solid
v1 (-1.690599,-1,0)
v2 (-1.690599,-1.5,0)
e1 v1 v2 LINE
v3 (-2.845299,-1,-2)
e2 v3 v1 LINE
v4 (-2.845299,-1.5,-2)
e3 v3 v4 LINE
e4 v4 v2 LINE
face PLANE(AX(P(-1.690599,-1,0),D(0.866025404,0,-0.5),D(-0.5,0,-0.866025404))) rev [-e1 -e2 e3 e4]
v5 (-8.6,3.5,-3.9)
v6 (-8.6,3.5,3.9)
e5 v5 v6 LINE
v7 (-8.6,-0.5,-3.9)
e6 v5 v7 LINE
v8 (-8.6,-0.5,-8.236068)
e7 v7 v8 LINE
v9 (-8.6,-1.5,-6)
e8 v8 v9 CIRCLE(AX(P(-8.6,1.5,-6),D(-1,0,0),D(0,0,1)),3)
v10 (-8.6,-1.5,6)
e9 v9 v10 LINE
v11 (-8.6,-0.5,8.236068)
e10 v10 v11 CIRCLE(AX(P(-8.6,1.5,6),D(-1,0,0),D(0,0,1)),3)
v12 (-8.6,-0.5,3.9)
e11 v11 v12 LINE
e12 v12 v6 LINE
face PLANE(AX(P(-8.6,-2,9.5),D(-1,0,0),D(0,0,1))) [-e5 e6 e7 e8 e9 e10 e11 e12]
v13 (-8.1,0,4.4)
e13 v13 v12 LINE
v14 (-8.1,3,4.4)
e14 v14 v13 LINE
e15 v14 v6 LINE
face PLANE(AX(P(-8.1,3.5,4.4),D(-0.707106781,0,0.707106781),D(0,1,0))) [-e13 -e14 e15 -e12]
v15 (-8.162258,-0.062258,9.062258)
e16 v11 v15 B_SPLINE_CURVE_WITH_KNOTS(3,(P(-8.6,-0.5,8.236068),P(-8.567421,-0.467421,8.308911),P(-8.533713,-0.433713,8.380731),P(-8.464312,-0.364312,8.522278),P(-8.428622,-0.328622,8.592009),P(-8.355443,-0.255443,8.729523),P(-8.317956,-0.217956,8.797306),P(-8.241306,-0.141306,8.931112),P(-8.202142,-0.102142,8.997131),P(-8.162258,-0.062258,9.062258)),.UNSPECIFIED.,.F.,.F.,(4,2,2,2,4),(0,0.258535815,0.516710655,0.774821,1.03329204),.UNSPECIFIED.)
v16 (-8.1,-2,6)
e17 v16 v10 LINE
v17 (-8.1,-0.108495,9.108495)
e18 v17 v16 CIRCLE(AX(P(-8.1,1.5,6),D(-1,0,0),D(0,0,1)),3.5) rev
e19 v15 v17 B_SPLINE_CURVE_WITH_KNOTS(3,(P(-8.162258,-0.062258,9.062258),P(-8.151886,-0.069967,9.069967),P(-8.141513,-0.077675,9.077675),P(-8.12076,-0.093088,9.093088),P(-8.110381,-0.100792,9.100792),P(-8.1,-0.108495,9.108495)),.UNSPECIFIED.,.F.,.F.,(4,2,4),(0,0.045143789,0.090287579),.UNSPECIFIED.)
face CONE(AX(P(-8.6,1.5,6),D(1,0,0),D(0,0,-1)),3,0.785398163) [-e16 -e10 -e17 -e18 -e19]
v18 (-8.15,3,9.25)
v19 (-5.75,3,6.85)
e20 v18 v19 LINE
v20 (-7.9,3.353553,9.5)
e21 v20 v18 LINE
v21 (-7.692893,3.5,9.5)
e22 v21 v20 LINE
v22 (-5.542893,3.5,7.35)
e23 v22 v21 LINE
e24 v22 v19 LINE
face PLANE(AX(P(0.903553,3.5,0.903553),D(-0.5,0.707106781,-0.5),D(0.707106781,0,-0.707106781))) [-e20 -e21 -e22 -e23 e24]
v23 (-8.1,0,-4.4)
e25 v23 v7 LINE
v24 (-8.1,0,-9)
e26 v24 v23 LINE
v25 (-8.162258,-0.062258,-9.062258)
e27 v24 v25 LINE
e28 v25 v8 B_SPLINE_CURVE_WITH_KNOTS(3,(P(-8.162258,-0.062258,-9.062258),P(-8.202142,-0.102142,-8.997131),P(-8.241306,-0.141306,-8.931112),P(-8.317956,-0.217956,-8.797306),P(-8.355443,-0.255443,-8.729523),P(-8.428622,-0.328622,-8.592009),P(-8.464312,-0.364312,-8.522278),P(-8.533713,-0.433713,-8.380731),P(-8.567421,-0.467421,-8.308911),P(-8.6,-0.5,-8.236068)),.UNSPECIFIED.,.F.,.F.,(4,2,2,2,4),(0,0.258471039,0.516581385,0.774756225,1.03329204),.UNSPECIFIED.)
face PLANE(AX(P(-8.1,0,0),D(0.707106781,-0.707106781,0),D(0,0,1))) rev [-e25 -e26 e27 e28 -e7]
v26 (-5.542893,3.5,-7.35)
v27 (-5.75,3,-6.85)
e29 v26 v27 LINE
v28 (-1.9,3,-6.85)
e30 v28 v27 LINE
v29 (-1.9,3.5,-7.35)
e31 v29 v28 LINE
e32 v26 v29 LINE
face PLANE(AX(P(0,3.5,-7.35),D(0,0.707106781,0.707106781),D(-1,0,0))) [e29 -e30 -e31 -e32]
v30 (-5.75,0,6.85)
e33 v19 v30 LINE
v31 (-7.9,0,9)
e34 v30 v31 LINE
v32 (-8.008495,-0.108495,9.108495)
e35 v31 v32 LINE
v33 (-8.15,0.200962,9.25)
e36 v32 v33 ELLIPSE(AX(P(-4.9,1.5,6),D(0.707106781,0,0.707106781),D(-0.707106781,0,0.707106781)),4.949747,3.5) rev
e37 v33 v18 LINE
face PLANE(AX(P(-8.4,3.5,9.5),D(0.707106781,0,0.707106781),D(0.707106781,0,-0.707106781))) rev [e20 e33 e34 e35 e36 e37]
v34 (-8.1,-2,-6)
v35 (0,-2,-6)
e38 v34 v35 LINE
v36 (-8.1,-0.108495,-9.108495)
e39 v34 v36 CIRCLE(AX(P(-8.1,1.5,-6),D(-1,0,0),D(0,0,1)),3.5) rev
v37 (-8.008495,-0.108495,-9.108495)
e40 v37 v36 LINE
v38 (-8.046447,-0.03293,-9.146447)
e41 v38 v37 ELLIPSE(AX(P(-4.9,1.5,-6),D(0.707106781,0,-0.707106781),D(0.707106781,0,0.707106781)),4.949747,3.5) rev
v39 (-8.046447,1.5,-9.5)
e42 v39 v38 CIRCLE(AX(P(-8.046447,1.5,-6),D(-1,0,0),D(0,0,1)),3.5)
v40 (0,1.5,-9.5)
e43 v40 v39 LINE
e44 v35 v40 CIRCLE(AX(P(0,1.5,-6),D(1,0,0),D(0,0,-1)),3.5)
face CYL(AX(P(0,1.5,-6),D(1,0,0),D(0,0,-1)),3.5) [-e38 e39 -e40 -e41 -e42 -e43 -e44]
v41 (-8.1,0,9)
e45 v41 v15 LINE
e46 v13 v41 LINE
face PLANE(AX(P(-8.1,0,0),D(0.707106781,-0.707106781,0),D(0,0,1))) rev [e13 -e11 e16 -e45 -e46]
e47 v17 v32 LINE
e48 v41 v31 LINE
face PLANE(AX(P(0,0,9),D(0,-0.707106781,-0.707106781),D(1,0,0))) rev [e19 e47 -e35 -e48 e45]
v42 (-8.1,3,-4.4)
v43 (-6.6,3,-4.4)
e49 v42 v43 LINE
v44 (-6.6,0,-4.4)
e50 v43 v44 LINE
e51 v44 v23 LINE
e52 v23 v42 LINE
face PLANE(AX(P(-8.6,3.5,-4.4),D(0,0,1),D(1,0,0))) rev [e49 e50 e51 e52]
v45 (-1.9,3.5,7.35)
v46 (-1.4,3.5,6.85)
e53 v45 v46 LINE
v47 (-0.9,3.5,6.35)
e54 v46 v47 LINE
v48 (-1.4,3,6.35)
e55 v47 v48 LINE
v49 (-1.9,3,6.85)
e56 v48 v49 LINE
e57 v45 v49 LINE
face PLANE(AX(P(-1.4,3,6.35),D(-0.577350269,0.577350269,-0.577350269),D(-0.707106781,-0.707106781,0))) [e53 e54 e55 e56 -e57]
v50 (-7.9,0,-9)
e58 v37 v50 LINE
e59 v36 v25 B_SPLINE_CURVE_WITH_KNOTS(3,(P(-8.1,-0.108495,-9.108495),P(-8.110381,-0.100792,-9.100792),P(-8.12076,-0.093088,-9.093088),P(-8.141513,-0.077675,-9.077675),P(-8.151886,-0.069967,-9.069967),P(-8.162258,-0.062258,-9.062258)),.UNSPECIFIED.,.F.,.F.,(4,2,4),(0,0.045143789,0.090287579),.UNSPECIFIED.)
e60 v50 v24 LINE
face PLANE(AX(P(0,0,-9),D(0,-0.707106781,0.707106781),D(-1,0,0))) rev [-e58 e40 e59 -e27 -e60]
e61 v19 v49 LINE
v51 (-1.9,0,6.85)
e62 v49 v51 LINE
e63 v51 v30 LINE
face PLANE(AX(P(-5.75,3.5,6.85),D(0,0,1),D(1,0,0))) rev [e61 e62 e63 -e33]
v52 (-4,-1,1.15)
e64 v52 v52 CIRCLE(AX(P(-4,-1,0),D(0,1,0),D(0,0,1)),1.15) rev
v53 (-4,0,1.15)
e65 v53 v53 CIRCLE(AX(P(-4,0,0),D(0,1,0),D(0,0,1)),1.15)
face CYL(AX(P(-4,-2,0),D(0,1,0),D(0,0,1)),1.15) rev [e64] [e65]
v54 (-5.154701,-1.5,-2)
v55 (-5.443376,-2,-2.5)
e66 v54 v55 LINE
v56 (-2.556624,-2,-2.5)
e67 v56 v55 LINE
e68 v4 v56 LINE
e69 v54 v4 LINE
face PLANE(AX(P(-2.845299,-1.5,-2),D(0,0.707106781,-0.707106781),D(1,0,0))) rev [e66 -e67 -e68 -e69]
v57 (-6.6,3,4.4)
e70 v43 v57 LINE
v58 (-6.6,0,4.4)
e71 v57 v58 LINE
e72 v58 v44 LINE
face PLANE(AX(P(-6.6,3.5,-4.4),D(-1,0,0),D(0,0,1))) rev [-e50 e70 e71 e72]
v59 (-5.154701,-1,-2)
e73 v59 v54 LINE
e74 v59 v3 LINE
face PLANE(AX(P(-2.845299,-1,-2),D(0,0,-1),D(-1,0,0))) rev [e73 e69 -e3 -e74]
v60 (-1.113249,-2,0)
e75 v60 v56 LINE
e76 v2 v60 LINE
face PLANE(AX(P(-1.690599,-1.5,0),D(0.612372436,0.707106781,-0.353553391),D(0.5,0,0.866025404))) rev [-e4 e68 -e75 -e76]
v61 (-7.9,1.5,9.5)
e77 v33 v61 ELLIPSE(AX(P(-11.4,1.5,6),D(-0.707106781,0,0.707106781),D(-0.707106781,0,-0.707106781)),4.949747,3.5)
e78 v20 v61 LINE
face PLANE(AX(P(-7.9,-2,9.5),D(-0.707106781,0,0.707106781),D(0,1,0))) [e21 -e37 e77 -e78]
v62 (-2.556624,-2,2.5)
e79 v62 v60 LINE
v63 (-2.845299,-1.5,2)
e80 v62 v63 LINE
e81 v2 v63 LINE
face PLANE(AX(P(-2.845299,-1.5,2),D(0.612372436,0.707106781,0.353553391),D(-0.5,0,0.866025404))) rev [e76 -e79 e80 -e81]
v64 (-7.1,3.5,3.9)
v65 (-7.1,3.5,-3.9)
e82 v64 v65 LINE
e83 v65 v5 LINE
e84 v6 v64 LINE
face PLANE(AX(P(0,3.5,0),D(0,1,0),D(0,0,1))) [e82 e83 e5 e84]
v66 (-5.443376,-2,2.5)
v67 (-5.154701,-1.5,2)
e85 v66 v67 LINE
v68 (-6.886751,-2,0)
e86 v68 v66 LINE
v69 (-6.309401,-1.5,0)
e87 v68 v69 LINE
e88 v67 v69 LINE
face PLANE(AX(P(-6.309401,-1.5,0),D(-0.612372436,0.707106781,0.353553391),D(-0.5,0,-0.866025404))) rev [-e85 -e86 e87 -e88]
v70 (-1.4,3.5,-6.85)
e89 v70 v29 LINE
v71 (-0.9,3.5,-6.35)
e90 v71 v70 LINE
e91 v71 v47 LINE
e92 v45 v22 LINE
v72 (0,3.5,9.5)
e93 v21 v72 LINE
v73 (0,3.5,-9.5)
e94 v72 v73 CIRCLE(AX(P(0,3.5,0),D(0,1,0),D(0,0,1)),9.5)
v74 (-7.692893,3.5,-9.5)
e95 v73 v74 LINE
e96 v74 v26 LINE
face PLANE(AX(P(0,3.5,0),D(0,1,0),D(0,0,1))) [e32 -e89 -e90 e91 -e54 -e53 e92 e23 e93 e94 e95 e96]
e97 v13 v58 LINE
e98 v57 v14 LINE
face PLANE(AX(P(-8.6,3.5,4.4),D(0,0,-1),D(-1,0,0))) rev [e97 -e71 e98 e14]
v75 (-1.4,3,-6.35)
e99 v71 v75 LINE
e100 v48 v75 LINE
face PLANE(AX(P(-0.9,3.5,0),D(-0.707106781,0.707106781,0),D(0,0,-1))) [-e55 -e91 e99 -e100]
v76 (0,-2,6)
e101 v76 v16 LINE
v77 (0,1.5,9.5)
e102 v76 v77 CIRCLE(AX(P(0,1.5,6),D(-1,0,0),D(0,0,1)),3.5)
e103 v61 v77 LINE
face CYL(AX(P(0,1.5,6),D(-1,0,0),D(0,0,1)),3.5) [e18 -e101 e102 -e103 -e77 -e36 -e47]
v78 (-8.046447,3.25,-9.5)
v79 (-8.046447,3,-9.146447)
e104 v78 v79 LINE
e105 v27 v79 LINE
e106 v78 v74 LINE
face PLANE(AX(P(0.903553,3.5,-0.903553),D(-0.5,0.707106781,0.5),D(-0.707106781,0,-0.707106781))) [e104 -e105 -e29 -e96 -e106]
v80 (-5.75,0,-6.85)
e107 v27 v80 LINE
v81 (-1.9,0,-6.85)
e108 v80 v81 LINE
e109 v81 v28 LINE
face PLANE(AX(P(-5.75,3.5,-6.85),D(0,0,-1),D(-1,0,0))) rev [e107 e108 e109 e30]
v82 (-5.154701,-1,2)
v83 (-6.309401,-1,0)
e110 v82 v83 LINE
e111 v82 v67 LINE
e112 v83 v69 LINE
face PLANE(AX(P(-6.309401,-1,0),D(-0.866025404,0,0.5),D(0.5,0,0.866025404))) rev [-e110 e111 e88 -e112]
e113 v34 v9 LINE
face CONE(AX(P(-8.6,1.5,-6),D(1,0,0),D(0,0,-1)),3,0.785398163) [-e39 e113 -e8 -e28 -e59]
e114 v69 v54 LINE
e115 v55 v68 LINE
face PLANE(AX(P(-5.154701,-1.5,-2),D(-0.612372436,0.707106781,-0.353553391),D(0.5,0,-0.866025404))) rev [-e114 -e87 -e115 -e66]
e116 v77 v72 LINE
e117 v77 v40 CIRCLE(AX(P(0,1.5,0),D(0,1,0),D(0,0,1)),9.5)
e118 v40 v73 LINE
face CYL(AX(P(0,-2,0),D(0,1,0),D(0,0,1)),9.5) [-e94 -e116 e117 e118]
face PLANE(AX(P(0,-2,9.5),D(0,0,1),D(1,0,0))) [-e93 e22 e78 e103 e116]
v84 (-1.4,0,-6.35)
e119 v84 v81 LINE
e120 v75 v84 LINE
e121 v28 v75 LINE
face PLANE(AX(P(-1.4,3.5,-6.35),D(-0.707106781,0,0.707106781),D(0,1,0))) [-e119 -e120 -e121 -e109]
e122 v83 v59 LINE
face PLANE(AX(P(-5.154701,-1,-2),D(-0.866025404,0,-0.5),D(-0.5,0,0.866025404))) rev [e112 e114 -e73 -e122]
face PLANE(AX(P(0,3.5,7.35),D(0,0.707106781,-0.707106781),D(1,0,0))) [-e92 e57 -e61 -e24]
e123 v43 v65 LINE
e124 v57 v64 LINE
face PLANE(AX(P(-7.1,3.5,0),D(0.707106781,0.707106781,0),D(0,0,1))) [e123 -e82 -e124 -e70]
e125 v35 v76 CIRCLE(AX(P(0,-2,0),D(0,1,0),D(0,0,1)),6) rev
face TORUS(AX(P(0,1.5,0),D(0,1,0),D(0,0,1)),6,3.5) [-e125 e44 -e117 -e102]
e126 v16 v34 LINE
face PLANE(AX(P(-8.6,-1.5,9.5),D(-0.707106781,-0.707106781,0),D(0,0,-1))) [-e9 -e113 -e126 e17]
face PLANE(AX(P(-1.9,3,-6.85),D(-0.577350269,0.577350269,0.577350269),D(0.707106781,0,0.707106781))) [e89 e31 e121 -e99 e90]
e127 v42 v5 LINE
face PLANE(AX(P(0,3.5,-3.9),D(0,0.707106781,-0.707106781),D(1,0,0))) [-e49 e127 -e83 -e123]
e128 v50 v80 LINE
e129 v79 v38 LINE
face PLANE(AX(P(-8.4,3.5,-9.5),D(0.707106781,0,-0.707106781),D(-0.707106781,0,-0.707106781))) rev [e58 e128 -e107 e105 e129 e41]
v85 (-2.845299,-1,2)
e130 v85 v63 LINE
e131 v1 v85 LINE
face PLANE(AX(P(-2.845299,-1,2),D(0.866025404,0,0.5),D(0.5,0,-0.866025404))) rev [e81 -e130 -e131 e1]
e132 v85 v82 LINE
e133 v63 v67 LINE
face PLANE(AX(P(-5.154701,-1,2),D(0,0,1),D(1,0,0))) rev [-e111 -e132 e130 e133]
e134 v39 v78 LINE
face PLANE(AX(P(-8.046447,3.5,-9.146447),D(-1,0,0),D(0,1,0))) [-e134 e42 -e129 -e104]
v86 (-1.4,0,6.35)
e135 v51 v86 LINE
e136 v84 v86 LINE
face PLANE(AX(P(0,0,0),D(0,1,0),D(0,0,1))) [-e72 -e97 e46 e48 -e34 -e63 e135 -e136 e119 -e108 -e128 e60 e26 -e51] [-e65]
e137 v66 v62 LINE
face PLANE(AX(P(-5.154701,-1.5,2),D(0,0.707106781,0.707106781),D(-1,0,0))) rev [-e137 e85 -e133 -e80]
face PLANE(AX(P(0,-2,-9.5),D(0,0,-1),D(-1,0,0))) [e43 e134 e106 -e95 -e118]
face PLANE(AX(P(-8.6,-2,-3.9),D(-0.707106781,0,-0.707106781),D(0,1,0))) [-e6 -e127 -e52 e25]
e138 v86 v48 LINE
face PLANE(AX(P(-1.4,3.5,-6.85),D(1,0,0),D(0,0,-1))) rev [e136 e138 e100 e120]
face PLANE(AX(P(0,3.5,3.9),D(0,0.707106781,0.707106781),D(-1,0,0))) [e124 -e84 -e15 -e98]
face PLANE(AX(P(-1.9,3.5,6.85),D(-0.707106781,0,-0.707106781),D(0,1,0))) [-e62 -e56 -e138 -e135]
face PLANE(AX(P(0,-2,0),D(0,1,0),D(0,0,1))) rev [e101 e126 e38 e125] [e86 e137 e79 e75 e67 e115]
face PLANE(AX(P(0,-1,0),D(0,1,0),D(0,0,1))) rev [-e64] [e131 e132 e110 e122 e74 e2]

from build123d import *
from OCP.BRepFilletAPI import BRepFilletAPI_MakeChamfer

# Parameters (mm, degrees)
BOSS_EXTRUDE1_DEPTH     = 2
BOSS_EXTRUDE2_START     = 3.5
BOSS_EXTRUDE2_DEPTH     = 3.5
CUT_EXTRUDE1_DEPTH      = 14.883443377
CUT_EXTRUDE1_DEPTH_BACK = 14.883443377
SKETCH4_R               = 1.15
CUT_EXTRUDE2_DEPTH      = 1
CHAMFER1_SIZE           = 0.5
CHAMFER1_SIZE2          = 0.353553391
FILLET1_R               = 3.5
CHAMFER2_SIZE           = 0.5


with BuildPart() as part:
    # Sketch1 → Boss-Extrude1 (new body)
    with BuildSketch(Plane(origin=(0, 0, 0), x_dir=(1, 0, 0), z_dir=(0, 1, 0))):
        with BuildLine():
            Line((-8.6, -4.5), (-8.6, 4.5))
            Line((-8.6, 4.5), (-8.6, 9.5))
            Line((-8.6, 9.5), (0, 9.5))
            ThreePointArc((0, 9.5), (9.5, 0), (0, -9.5))
            Line((0, -9.5), (-8.6, -9.5))
            Line((-8.6, -9.5), (-8.6, -4.5))
        make_face()
    extrude(amount=-BOSS_EXTRUDE1_DEPTH)

    # Sketch2 → Boss-Extrude2 (add)
    with BuildSketch(Plane(origin=(0, 0, 0), x_dir=(1, 0, 0), z_dir=(0, 1, 0)).offset(BOSS_EXTRUDE2_START)):
        Polygon((-8.6, 4.4), (-6.6, 4.4), (-6.6, -4.4), (-8.6, -4.4), (-8.6, 0), align=None)
        with BuildLine():
            Line((-8.4, 9.5), (-5.75, 6.85))
            Line((-5.75, 6.85), (-1.4, 6.85))
            Line((-1.4, 6.85), (-1.4, -6.85))
            Line((-1.4, -6.85), (-5.75, -6.85))
            Line((-5.75, -6.85), (-8.4, -9.5))
            Line((-8.4, -9.5), (0, -9.5))
            ThreePointArc((0, -9.5), (9.5, 0), (0, 9.5))
            Line((0, 9.5), (-8.4, 9.5))
        make_face()
    extrude(amount=-BOSS_EXTRUDE2_DEPTH)

    # Sketch4 → Cut-Extrude1 (cut, two sides: drawn at the far end of the back side and taken through both)
    with BuildSketch(Plane(origin=(0, 0, 0), x_dir=(1, 0, 0), z_dir=(0, 1, 0)).offset(-CUT_EXTRUDE1_DEPTH_BACK)):
        with Locations(Location((-4, 0, 0), (0, 0, 270))):
            Circle(SKETCH4_R)
    extrude(amount=CUT_EXTRUDE1_DEPTH + CUT_EXTRUDE1_DEPTH_BACK, mode=Mode.SUBTRACT)

    # Sketch14 → Cut-Extrude2 (cut)
    with BuildSketch(Plane.XZ.offset(2)):
        Polygon((-5.154700538, 2), (-2.845299462, 2), (-1.690598923, 0), (-2.845299462, -2), (-5.154700538, -2), (-6.309401077, 0), align=None)
    extrude(amount=-CUT_EXTRUDE2_DEPTH, mode=Mode.SUBTRACT)

    # Chamfer1: one chamfer whose edges measure the first distance from different faces: ONE call of the kernel's chamfer builder (chamfer() names one face for all edges)
    chamfer1_edges_1 = [part.edges().sort_by_distance(p)[0] for p in [
        (-8.6, 0, 6.95),
        (-8.6, 1.75, -4.4),
        (-8.6, 1.75, 4.4),
        (-7.6, 3.5, 4.4),
        (-6.6, 3.5, 0),
        (-7.6, 3.5, -4.4),
        (-8.5, 0, -9.5),
        (-1.4, 1.75, -6.85),
        (-1.4, 1.75, 6.85),
        (-7.075, 3.5, -8.175),
        (-3.575, 3.5, -6.85),
        (-1.4, 3.5, 0),
        (-3.575, 3.5, 6.85),
        (-7.075, 3.5, 8.175),
        (-5.732050808, -2, 1),
        (-5.732050808, -2, -1),
        (-4, -2, -2),
        (-2.267949192, -2, -1),
        (-2.267949192, -2, 1),
        (-4, -2, 2),
        (-8.5, 0, 9.5),
        (-8.6, 0, -6.95),
    ]]
    chamfer1_edges_2 = [part.edges().sort_by_distance(p)[0] for p in [
        (-8.4, 1.75, -9.5),
    ]]
    chamfer1_side_2 = [part.faces().sort_by_distance(p)[0] for p in [
        (-7.075, 1.75, -8.175),
    ]]
    chamfer1_edges_3 = [part.edges().sort_by_distance(p)[0] for p in [
        (-8.4, 1.75, 9.5),
    ]]
    chamfer1_side_3 = [part.faces().sort_by_distance(p)[0] for p in [
        (-4.236909871, 0.734978541, 9.5),
    ]]
    chamfer1 = BRepFilletAPI_MakeChamfer(part.part.solid().wrapped)
    for e in chamfer1_edges_1:
        chamfer1.Add(CHAMFER1_SIZE, e.wrapped)
    for e in chamfer1_edges_2:
        chamfer1.Add(CHAMFER1_SIZE, CHAMFER1_SIZE2, e.wrapped, chamfer1_side_2[0].wrapped)  # the first distance lies on this face
    for e in chamfer1_edges_3:
        chamfer1.Add(CHAMFER1_SIZE, CHAMFER1_SIZE2, e.wrapped, chamfer1_side_3[0].wrapped)  # the first distance lies on this face
    add(Compound.cast(chamfer1.Shape()), mode=Mode.REPLACE)

    # Fillet1
    # the kernel refuses this fillet: 3.5 mm, written as the material it takes off along each edge
    with BuildSketch(Plane(origin=(0, -2, 9.5), x_dir=(0, 1, 0), z_dir=(-1, 0, 0))) as fillet1_piece_1:
        with BuildLine():
            CenterArc((FILLET1_R, FILLET1_R), FILLET1_R, 180, 90)
            Line((0, FILLET1_R), (0, 0))
            Line((0, 0), (FILLET1_R, 0))
        make_face()
    extrude(amount=17.35, mode=Mode.SUBTRACT)
    with BuildSketch(Plane(origin=(-17.35, -2, -9.5), x_dir=(0, 0, 1), z_dir=(1, 0, 0))) as fillet1_piece_2:
        with BuildLine():
            CenterArc((FILLET1_R, -FILLET1_R), FILLET1_R, 90, 90)
            Line((0, -FILLET1_R), (0, 0))
            Line((0, 0), (FILLET1_R, 0))
        make_face()
    extrude(amount=17.35, mode=Mode.SUBTRACT)
    with BuildSketch(Plane(origin=(0, -2, 0), x_dir=(0, 0, -1), z_dir=(-1, 0, 0))) as fillet1_piece_3:
        with BuildLine():
            CenterArc((9.5 - FILLET1_R, -FILLET1_R), FILLET1_R, 0, 90)
            Line((9.5, -FILLET1_R), (9.5, 0))
            Line((9.5, 0), (9.5 - FILLET1_R, 0))
        make_face()
    revolve(axis=Axis((0, -2, 0), (0, -1, 0)), revolution_arc=180, mode=Mode.SUBTRACT)

    # Chamfer2
    chamfer2_edges = [part.edges().sort_by_distance(p)[0] for p in [
        (-8.6, -1.602418411, -7.620185175),
        (-8.6, -1.602418411, 7.620185175),
        (-8.6, -2, 0),
    ]]
    chamfer(chamfer2_edges, length=CHAMFER2_SIZE)


solid = part.part
